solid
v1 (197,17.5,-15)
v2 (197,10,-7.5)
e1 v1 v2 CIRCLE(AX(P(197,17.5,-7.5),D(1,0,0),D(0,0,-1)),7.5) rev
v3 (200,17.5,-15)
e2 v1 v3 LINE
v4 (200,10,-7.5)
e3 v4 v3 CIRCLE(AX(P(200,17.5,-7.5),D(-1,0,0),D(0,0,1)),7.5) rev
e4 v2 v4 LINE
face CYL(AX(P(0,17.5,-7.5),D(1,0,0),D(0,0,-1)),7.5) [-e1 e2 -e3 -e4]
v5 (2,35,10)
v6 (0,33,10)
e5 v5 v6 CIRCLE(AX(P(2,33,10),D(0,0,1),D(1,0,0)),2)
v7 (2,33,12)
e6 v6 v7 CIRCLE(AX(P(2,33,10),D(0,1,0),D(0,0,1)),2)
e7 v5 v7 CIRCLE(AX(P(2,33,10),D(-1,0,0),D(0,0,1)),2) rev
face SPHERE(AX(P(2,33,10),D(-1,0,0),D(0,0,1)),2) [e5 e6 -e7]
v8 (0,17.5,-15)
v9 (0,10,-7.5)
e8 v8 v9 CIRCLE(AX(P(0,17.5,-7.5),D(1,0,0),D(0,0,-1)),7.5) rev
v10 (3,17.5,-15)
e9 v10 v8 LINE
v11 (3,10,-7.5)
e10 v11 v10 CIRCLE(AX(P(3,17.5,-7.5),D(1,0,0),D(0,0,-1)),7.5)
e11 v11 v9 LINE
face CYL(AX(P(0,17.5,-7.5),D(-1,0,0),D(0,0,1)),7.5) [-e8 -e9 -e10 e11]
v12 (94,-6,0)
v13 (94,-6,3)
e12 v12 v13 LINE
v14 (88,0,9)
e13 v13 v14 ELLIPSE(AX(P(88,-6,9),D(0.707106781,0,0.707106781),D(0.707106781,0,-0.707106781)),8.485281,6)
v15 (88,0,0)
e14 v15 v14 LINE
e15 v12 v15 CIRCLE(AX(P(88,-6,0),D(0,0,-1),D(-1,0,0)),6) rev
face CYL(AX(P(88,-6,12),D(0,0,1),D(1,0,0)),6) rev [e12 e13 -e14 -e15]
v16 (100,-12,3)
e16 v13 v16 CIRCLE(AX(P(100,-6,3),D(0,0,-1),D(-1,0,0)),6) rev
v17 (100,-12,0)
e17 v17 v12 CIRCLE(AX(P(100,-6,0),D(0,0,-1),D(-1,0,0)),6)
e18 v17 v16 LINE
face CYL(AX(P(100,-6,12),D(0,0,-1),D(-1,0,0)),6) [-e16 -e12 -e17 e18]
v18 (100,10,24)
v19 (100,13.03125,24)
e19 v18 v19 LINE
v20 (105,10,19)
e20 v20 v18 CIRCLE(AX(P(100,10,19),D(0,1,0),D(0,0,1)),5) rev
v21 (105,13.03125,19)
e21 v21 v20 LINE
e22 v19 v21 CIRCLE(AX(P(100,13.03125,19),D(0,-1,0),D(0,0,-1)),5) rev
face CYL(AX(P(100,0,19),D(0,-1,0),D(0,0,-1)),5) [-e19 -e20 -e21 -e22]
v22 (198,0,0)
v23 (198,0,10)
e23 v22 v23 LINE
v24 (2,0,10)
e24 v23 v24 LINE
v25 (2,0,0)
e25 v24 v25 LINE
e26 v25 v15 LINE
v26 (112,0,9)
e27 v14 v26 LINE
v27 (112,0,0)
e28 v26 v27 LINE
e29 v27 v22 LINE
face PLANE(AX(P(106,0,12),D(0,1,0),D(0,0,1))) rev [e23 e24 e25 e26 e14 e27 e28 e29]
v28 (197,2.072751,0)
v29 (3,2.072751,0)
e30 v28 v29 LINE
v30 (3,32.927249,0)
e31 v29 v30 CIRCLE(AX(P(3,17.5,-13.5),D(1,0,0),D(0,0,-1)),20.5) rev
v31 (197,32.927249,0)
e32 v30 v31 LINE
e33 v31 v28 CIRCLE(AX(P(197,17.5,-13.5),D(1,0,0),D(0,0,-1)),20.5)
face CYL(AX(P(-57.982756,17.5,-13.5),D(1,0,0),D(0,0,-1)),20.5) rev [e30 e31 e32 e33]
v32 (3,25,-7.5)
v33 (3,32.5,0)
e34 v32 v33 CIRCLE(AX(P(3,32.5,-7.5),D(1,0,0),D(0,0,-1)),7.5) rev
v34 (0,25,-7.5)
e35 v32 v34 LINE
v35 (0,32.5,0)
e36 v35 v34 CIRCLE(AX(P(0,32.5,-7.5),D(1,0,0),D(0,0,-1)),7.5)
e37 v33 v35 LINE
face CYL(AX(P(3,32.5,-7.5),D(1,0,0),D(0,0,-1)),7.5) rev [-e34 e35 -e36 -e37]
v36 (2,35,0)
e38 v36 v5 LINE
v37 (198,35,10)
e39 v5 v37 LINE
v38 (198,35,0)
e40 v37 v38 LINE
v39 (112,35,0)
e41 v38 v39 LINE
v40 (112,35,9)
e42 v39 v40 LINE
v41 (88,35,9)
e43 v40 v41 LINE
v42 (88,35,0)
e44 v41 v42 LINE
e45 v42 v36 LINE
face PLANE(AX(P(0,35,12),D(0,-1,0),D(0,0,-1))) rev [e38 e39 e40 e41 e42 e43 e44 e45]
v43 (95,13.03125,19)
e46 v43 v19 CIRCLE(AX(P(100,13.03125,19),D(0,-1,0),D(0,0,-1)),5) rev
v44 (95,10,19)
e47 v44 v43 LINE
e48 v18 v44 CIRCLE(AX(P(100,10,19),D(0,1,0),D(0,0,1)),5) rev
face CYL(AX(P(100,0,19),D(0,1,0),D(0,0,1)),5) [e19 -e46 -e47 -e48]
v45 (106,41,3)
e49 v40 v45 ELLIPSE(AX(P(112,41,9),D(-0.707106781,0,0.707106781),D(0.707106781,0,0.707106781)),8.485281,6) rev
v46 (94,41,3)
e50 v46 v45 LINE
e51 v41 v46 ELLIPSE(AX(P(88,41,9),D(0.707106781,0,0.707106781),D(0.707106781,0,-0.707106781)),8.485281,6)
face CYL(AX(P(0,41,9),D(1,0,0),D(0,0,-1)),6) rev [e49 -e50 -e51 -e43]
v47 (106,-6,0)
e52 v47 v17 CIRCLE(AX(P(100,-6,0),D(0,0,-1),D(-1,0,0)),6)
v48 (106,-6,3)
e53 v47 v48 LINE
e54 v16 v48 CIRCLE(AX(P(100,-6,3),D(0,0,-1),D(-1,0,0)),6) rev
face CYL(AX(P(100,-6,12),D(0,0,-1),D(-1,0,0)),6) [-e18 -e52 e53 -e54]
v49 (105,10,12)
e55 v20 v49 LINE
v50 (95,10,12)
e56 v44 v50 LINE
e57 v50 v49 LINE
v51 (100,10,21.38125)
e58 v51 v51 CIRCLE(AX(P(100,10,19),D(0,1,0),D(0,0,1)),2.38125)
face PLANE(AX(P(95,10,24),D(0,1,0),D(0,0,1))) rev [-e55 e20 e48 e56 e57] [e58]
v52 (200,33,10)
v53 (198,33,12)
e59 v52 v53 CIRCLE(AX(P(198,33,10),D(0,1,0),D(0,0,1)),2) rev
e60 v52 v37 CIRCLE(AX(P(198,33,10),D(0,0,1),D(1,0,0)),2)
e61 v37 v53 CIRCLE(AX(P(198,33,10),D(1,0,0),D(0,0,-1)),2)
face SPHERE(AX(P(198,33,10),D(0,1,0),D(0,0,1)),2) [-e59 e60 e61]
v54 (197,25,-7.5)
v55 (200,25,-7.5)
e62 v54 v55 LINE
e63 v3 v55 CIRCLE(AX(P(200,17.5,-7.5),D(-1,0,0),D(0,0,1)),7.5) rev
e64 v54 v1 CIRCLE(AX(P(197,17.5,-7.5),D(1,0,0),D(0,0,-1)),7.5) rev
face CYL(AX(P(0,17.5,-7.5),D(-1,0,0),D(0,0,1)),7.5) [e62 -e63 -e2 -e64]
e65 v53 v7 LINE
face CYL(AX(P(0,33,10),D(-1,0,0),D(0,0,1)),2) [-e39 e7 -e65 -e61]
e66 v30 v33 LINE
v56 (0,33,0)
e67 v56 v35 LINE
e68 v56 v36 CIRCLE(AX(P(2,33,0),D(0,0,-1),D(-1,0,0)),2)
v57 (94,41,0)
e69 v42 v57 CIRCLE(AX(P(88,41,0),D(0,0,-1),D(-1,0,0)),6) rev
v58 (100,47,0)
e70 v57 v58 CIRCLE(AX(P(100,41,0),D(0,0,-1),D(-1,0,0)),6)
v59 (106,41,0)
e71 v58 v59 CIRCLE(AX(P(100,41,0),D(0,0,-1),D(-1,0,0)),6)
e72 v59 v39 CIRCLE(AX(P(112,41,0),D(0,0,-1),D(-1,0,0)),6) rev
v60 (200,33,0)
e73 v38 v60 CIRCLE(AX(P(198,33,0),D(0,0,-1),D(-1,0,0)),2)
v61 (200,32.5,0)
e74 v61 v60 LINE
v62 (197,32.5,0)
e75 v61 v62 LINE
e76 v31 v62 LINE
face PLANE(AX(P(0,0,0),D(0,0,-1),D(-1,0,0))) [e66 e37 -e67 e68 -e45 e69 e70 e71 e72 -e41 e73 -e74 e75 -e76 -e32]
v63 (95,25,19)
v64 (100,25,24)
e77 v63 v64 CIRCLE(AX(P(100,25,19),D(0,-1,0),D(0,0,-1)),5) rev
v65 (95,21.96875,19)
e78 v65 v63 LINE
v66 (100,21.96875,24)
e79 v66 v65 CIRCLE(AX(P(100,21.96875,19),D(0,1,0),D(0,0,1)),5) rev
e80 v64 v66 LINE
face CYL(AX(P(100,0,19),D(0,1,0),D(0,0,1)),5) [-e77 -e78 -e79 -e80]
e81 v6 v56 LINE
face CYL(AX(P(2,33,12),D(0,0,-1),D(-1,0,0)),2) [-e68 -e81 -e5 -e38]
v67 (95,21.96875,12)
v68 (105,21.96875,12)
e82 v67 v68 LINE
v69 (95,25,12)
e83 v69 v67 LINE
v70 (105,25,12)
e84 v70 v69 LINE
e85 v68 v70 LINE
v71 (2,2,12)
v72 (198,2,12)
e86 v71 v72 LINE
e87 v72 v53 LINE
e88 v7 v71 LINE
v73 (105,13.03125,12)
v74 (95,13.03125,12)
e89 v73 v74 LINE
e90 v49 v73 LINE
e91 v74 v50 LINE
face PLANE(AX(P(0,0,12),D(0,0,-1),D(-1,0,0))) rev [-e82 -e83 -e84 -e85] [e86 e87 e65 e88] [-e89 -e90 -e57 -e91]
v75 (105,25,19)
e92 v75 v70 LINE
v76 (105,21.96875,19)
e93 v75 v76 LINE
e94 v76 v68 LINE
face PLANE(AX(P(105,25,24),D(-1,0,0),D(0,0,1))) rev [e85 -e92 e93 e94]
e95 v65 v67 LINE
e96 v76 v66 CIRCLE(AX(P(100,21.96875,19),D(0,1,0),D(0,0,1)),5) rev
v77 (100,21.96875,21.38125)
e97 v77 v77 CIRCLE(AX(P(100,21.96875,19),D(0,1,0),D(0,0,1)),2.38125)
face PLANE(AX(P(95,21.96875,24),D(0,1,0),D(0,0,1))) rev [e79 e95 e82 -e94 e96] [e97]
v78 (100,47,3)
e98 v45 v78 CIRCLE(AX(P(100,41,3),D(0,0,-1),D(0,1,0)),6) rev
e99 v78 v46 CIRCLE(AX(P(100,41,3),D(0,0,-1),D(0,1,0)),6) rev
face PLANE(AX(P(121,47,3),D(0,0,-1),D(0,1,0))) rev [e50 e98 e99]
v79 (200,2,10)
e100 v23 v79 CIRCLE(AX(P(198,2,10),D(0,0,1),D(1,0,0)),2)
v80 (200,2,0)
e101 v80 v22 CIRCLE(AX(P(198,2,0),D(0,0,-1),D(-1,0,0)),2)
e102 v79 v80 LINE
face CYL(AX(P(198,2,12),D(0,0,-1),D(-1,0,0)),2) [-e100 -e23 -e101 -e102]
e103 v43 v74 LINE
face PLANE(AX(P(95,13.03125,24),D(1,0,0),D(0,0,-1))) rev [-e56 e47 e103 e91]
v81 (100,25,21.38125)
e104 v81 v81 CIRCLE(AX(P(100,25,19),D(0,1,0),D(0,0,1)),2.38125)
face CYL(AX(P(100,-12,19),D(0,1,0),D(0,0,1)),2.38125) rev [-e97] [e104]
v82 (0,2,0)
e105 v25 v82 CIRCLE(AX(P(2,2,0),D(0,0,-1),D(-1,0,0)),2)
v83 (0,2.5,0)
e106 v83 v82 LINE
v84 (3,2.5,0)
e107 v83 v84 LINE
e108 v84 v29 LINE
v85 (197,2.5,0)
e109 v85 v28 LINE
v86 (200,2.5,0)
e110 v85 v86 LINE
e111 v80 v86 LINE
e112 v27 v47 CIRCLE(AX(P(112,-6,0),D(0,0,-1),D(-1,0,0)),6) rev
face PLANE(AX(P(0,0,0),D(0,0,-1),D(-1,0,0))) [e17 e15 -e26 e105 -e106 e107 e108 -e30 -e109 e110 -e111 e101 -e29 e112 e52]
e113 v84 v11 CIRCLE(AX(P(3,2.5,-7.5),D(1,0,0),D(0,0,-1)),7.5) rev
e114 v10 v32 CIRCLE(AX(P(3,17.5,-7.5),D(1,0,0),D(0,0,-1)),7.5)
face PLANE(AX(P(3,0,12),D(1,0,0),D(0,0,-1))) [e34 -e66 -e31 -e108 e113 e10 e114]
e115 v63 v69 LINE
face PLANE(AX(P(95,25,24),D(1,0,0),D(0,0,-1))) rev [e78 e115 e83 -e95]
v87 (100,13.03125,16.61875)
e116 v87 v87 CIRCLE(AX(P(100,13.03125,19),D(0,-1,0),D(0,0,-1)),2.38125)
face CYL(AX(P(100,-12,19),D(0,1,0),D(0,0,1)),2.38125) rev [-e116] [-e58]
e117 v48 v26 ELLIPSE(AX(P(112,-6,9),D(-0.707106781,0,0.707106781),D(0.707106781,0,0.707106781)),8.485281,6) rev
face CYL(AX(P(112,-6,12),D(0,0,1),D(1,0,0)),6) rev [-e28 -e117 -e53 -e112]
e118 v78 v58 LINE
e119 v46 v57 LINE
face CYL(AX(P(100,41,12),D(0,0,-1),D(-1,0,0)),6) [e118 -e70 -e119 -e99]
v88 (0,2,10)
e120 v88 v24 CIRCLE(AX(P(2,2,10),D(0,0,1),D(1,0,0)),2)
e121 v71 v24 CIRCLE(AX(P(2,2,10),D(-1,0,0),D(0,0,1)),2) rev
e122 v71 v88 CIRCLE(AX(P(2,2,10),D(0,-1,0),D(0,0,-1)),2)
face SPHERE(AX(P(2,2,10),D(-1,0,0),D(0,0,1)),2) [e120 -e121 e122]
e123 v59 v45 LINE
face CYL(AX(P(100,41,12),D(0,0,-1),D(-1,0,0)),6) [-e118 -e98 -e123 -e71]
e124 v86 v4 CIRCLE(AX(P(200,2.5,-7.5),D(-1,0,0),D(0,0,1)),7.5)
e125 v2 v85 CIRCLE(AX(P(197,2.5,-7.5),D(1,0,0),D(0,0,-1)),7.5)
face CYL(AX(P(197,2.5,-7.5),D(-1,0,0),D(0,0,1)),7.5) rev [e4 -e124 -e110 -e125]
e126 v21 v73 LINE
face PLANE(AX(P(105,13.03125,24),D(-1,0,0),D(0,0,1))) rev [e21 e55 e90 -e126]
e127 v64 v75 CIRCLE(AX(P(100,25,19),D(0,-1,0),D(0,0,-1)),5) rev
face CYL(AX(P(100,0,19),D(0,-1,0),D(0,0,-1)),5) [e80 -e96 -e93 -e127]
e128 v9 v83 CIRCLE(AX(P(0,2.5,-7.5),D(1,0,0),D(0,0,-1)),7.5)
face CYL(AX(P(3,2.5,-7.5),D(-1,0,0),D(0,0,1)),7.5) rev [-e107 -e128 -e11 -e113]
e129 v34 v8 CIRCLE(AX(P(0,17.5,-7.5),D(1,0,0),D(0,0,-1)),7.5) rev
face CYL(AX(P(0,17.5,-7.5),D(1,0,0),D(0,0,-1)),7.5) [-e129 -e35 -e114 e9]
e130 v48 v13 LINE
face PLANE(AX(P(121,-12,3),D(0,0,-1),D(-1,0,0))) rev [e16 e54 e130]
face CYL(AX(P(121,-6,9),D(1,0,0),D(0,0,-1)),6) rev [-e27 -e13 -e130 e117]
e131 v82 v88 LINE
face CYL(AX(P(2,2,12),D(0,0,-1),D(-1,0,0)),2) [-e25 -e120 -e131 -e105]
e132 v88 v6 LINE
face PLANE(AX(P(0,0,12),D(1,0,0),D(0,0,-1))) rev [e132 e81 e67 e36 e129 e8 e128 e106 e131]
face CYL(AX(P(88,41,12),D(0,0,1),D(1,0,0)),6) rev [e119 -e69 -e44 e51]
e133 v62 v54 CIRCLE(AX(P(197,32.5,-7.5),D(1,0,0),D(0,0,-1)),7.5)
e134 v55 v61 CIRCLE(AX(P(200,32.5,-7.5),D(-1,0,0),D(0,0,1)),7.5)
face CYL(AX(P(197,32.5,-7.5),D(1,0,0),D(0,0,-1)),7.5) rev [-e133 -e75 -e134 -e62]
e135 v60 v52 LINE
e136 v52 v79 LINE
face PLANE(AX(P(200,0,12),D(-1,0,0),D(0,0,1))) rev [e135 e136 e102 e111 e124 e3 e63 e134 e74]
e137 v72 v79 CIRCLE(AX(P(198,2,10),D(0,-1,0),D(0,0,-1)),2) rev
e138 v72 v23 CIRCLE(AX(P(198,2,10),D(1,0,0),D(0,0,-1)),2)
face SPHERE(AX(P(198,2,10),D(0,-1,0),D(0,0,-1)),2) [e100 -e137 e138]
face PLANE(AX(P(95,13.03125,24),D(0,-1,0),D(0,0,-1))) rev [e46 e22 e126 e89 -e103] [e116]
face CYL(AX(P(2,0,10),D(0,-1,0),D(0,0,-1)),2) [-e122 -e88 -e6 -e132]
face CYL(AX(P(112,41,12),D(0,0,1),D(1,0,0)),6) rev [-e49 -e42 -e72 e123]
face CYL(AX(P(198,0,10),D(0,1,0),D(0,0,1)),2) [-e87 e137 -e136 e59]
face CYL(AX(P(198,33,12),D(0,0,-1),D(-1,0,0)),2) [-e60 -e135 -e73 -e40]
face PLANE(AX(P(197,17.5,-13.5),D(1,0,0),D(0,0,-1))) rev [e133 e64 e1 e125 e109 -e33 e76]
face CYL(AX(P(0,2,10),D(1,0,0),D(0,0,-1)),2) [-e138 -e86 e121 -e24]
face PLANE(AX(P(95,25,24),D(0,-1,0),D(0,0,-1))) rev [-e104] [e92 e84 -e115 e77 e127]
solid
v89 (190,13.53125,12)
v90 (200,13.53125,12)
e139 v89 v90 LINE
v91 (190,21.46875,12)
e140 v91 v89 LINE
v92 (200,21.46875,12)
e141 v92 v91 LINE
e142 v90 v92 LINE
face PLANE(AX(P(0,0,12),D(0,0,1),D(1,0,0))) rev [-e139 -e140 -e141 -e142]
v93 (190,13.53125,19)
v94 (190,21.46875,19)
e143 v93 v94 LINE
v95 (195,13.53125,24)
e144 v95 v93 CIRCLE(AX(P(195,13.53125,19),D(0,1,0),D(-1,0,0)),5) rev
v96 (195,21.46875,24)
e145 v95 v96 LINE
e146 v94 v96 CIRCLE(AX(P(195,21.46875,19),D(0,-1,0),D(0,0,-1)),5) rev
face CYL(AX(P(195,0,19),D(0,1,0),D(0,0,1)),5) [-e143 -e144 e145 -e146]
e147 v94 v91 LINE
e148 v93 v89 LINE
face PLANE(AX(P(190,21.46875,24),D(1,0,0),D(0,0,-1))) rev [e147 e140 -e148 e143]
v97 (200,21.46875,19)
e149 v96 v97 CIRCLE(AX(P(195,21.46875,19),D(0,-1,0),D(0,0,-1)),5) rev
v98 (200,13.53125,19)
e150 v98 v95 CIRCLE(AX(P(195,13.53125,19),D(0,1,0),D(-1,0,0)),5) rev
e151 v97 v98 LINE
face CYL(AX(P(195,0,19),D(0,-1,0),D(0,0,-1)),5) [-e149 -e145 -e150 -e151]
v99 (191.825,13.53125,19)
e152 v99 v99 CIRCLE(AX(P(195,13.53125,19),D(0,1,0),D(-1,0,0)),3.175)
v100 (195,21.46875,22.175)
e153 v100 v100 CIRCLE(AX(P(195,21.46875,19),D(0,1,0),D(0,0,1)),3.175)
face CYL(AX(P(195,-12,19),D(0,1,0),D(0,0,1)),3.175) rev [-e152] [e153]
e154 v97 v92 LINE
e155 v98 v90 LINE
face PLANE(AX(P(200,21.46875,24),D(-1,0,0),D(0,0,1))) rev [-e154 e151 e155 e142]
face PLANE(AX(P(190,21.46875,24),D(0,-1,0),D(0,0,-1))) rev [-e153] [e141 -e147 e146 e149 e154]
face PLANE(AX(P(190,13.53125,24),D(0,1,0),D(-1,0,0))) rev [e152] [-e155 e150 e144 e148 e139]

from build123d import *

# Parameters (mm, degrees)
BOSS_EXTRUDE1_DEPTH = 12
SKETCH7_W           = 10
SKETCH7_H           = 7.9375
BOSS_EXTRUDE2_DEPTH = 12
SKETCH9_R           = 3.175
CUT_EXTRUDE3_DEPTH  = 205.196369279
SKETCH15_W          = 10
SKETCH15_H          = 3.03125
BOSS_EXTRUDE4_DEPTH = 12
SKETCH16_R          = 2.38125
CUT_EXTRUDE7_DEPTH  = 205.8047851
FILLET1_R           = 5
FILLET2_R           = 5
SKETCH17_R          = 20.5
CUT_EXTRUDE8_DEPTH  = 194
SKETCH18_W          = 3
SKETCH18_H          = 15
BOSS_EXTRUDE5_DEPTH = 15
FILLET3_DEPTH       = 200
FILLET3_2_DEPTH     = 3
FILLET3_START       = 197
FILLET3_3_DEPTH     = 3
SKETCH19_W          = 9
SKETCH19_H          = 12
CUT_EXTRUDE9_DEPTH  = 12
FILLET4_R           = 6
FILLET5_R           = 2


with BuildPart() as part:
    # Sketch2 → Boss-Extrude1 (new body)
    with BuildSketch(Plane.XY):
        Polygon((0, 0), (94, 0), (94, -12), (106, -12), (106, 0), (200, 0), (200, 35), (106, 35), (106, 47), (94, 47), (94, 35), (0, 35), align=None)
    extrude(amount=BOSS_EXTRUDE1_DEPTH)

    # Sketch15 → Boss-Extrude4 (add)
    with BuildSketch(Plane.XY.offset(12)):
        with Locations((100, 23.484375)):
            Rectangle(SKETCH15_W, SKETCH15_H)
        with Locations((100, 11.515625)):
            Rectangle(SKETCH15_W, SKETCH15_H)
    extrude(amount=BOSS_EXTRUDE4_DEPTH)

    # Sketch16 → Cut-Extrude7 (cut, through all)
    with BuildSketch(Plane(origin=(0, 25, 0), x_dir=(1, 0, 0), z_dir=(0, 1, 0))):
        with Locations(Location((100, -19, 0), (0, 0, 270))):
            Circle(SKETCH16_R)
    extrude(amount=-CUT_EXTRUDE7_DEPTH, mode=Mode.SUBTRACT)

    # Fillet2
    fillet2_edges = [part.edges().sort_by_distance(p)[0] for p in [
        (95, 11.515625, 24),
        (105, 11.515625, 24),
        (105, 23.484375, 24),
        (95, 23.484375, 24),
    ]]
    fillet(fillet2_edges, radius=FILLET2_R - 0.0001)  # a hair under: the kernel refuses the full size

    # Sketch17 → Cut-Extrude8 (cut)
    with BuildSketch(Plane(origin=(197, 0, 0), x_dir=(0, 0, -1), z_dir=(1, 0, 0))):
        with Locations((13.5, 17.5)):
            Circle(SKETCH17_R)
    extrude(amount=-CUT_EXTRUDE8_DEPTH, mode=Mode.SUBTRACT)

    # Sketch18 → Boss-Extrude5 (add)
    with BuildSketch(Plane(origin=(0, 0, 0), x_dir=(-1, 0, 0), z_dir=(0, 0, -1))):
        with Locations((-1.5, 17.5)):
            Rectangle(SKETCH18_W, SKETCH18_H)
        with Locations((-198.5, 17.5)):
            Rectangle(SKETCH18_W, SKETCH18_H)
    extrude(amount=BOSS_EXTRUDE5_DEPTH)

    # Fillet3: read off the stored shape, not the designer's step
    # Fillet3 outline → Fillet3 (cut)
    with BuildSketch(Plane.YZ):
        with BuildLine():
            Line((10, -15), (17.5, -15))
            ThreePointArc((17.5, -15), (12.196699141, -12.803300859), (10, -7.5))
            Line((10, -7.5), (10, -15))
        make_face()
        with BuildLine():
            Line((25, -15), (25, -7.5))
            ThreePointArc((25, -7.5), (22.803300859, -12.803300859), (17.5, -15))
            Line((17.5, -15), (25, -15))
        make_face()
    extrude(amount=FILLET3_DEPTH, mode=Mode.SUBTRACT)

    # Fillet3 2 outline → Fillet3 2 (add)
    with BuildSketch(Plane.YZ):
        with BuildLine():
            ThreePointArc((2.5, 0), (7.803300859, -2.196699141), (10, -7.5))
            Line((10, -7.5), (10, 0))
            Line((10, 0), (2.5, 0))
        make_face()
        with BuildLine():
            ThreePointArc((25, -7.5), (27.196699141, -2.196699141), (32.5, 0))
            Line((32.5, 0), (25, 0))
            Line((25, 0), (25, -7.5))
        make_face()
    extrude(amount=FILLET3_2_DEPTH)

    # Fillet3 3 outline → Fillet3 3 (add)
    with BuildSketch(Plane.YZ.offset(FILLET3_START)):
        with BuildLine():
            ThreePointArc((2.5, 0), (7.803300859, -2.196699141), (10, -7.5))
            Line((10, -7.5), (10, 0))
            Line((10, 0), (2.5, 0))
        make_face()
        with BuildLine():
            ThreePointArc((25, -7.5), (27.196699141, -2.196699141), (32.5, 0))
            Line((32.5, 0), (25, 0))
            Line((25, 0), (25, -7.5))
        make_face()
    extrude(amount=FILLET3_3_DEPTH)

    # Sketch19 → Cut-Extrude9 (cut)
    with BuildSketch(Plane.ZY.offset(-94)):
        with Locations((7.5, -6)):
            Rectangle(SKETCH19_W, SKETCH19_H)
        with Locations((7.5, 41)):
            Rectangle(SKETCH19_W, SKETCH19_H)
    extrude(amount=-CUT_EXTRUDE9_DEPTH, mode=Mode.SUBTRACT)

    # Fillet4
    fillet4_edges = [part.edges().sort_by_distance(p)[0] for p in [
        (94, 35, 1.5),
        (100, 35, 3),
        (106, 35, 1.5),
        (106, 47, 1.5),
        (94, 47, 1.5),
        (94, 0, 1.5),
        (100, 0, 3),
        (106, 0, 1.5),
        (94, -12, 1.5),
        (106, -12, 1.5),
    ]]
    fillet(fillet4_edges, radius=FILLET4_R - 0.0001)  # a hair under: the kernel refuses the full size

    # Fillet5
    fillet5_edges = [part.edges().sort_by_distance(p)[0] for p in [
        (0, 35, 6),
        (200, 35, 6),
        (200, 0, 6),
        (0, 0, 6),
        (200, 17.5, 12),
        (100, 35, 12),
        (0, 17.5, 12),
        (100, 0, 12),
    ]]
    fillet(fillet5_edges, radius=FILLET5_R)


with BuildPart() as body_2:
    # Sketch7 → Boss-Extrude2 (new body)
    with BuildSketch(Plane.XY.offset(12)):
        with Locations((195, 17.5)):
            Rectangle(SKETCH7_W, SKETCH7_H)
    extrude(amount=BOSS_EXTRUDE2_DEPTH)

    # Sketch9 → Cut-Extrude3 (cut, through all)
    with BuildSketch(Plane(origin=(0, 21.46875, 0), x_dir=(1, 0, 0), z_dir=(0, 1, 0))):
        with Locations(Location((195, -19, 0), (0, 0, 270))):
            Circle(SKETCH9_R)
    extrude(amount=-CUT_EXTRUDE3_DEPTH, mode=Mode.SUBTRACT)

    # Fillet1
    fillet1_edges = [body_2.edges().sort_by_distance(p)[0] for p in [
        (190, 17.5, 24),
        (200, 17.5, 24),
    ]]
    fillet(fillet1_edges, radius=FILLET1_R - 0.0001)  # a hair under: the kernel refuses the full size


solid = Compound([part.part, body_2.part])
